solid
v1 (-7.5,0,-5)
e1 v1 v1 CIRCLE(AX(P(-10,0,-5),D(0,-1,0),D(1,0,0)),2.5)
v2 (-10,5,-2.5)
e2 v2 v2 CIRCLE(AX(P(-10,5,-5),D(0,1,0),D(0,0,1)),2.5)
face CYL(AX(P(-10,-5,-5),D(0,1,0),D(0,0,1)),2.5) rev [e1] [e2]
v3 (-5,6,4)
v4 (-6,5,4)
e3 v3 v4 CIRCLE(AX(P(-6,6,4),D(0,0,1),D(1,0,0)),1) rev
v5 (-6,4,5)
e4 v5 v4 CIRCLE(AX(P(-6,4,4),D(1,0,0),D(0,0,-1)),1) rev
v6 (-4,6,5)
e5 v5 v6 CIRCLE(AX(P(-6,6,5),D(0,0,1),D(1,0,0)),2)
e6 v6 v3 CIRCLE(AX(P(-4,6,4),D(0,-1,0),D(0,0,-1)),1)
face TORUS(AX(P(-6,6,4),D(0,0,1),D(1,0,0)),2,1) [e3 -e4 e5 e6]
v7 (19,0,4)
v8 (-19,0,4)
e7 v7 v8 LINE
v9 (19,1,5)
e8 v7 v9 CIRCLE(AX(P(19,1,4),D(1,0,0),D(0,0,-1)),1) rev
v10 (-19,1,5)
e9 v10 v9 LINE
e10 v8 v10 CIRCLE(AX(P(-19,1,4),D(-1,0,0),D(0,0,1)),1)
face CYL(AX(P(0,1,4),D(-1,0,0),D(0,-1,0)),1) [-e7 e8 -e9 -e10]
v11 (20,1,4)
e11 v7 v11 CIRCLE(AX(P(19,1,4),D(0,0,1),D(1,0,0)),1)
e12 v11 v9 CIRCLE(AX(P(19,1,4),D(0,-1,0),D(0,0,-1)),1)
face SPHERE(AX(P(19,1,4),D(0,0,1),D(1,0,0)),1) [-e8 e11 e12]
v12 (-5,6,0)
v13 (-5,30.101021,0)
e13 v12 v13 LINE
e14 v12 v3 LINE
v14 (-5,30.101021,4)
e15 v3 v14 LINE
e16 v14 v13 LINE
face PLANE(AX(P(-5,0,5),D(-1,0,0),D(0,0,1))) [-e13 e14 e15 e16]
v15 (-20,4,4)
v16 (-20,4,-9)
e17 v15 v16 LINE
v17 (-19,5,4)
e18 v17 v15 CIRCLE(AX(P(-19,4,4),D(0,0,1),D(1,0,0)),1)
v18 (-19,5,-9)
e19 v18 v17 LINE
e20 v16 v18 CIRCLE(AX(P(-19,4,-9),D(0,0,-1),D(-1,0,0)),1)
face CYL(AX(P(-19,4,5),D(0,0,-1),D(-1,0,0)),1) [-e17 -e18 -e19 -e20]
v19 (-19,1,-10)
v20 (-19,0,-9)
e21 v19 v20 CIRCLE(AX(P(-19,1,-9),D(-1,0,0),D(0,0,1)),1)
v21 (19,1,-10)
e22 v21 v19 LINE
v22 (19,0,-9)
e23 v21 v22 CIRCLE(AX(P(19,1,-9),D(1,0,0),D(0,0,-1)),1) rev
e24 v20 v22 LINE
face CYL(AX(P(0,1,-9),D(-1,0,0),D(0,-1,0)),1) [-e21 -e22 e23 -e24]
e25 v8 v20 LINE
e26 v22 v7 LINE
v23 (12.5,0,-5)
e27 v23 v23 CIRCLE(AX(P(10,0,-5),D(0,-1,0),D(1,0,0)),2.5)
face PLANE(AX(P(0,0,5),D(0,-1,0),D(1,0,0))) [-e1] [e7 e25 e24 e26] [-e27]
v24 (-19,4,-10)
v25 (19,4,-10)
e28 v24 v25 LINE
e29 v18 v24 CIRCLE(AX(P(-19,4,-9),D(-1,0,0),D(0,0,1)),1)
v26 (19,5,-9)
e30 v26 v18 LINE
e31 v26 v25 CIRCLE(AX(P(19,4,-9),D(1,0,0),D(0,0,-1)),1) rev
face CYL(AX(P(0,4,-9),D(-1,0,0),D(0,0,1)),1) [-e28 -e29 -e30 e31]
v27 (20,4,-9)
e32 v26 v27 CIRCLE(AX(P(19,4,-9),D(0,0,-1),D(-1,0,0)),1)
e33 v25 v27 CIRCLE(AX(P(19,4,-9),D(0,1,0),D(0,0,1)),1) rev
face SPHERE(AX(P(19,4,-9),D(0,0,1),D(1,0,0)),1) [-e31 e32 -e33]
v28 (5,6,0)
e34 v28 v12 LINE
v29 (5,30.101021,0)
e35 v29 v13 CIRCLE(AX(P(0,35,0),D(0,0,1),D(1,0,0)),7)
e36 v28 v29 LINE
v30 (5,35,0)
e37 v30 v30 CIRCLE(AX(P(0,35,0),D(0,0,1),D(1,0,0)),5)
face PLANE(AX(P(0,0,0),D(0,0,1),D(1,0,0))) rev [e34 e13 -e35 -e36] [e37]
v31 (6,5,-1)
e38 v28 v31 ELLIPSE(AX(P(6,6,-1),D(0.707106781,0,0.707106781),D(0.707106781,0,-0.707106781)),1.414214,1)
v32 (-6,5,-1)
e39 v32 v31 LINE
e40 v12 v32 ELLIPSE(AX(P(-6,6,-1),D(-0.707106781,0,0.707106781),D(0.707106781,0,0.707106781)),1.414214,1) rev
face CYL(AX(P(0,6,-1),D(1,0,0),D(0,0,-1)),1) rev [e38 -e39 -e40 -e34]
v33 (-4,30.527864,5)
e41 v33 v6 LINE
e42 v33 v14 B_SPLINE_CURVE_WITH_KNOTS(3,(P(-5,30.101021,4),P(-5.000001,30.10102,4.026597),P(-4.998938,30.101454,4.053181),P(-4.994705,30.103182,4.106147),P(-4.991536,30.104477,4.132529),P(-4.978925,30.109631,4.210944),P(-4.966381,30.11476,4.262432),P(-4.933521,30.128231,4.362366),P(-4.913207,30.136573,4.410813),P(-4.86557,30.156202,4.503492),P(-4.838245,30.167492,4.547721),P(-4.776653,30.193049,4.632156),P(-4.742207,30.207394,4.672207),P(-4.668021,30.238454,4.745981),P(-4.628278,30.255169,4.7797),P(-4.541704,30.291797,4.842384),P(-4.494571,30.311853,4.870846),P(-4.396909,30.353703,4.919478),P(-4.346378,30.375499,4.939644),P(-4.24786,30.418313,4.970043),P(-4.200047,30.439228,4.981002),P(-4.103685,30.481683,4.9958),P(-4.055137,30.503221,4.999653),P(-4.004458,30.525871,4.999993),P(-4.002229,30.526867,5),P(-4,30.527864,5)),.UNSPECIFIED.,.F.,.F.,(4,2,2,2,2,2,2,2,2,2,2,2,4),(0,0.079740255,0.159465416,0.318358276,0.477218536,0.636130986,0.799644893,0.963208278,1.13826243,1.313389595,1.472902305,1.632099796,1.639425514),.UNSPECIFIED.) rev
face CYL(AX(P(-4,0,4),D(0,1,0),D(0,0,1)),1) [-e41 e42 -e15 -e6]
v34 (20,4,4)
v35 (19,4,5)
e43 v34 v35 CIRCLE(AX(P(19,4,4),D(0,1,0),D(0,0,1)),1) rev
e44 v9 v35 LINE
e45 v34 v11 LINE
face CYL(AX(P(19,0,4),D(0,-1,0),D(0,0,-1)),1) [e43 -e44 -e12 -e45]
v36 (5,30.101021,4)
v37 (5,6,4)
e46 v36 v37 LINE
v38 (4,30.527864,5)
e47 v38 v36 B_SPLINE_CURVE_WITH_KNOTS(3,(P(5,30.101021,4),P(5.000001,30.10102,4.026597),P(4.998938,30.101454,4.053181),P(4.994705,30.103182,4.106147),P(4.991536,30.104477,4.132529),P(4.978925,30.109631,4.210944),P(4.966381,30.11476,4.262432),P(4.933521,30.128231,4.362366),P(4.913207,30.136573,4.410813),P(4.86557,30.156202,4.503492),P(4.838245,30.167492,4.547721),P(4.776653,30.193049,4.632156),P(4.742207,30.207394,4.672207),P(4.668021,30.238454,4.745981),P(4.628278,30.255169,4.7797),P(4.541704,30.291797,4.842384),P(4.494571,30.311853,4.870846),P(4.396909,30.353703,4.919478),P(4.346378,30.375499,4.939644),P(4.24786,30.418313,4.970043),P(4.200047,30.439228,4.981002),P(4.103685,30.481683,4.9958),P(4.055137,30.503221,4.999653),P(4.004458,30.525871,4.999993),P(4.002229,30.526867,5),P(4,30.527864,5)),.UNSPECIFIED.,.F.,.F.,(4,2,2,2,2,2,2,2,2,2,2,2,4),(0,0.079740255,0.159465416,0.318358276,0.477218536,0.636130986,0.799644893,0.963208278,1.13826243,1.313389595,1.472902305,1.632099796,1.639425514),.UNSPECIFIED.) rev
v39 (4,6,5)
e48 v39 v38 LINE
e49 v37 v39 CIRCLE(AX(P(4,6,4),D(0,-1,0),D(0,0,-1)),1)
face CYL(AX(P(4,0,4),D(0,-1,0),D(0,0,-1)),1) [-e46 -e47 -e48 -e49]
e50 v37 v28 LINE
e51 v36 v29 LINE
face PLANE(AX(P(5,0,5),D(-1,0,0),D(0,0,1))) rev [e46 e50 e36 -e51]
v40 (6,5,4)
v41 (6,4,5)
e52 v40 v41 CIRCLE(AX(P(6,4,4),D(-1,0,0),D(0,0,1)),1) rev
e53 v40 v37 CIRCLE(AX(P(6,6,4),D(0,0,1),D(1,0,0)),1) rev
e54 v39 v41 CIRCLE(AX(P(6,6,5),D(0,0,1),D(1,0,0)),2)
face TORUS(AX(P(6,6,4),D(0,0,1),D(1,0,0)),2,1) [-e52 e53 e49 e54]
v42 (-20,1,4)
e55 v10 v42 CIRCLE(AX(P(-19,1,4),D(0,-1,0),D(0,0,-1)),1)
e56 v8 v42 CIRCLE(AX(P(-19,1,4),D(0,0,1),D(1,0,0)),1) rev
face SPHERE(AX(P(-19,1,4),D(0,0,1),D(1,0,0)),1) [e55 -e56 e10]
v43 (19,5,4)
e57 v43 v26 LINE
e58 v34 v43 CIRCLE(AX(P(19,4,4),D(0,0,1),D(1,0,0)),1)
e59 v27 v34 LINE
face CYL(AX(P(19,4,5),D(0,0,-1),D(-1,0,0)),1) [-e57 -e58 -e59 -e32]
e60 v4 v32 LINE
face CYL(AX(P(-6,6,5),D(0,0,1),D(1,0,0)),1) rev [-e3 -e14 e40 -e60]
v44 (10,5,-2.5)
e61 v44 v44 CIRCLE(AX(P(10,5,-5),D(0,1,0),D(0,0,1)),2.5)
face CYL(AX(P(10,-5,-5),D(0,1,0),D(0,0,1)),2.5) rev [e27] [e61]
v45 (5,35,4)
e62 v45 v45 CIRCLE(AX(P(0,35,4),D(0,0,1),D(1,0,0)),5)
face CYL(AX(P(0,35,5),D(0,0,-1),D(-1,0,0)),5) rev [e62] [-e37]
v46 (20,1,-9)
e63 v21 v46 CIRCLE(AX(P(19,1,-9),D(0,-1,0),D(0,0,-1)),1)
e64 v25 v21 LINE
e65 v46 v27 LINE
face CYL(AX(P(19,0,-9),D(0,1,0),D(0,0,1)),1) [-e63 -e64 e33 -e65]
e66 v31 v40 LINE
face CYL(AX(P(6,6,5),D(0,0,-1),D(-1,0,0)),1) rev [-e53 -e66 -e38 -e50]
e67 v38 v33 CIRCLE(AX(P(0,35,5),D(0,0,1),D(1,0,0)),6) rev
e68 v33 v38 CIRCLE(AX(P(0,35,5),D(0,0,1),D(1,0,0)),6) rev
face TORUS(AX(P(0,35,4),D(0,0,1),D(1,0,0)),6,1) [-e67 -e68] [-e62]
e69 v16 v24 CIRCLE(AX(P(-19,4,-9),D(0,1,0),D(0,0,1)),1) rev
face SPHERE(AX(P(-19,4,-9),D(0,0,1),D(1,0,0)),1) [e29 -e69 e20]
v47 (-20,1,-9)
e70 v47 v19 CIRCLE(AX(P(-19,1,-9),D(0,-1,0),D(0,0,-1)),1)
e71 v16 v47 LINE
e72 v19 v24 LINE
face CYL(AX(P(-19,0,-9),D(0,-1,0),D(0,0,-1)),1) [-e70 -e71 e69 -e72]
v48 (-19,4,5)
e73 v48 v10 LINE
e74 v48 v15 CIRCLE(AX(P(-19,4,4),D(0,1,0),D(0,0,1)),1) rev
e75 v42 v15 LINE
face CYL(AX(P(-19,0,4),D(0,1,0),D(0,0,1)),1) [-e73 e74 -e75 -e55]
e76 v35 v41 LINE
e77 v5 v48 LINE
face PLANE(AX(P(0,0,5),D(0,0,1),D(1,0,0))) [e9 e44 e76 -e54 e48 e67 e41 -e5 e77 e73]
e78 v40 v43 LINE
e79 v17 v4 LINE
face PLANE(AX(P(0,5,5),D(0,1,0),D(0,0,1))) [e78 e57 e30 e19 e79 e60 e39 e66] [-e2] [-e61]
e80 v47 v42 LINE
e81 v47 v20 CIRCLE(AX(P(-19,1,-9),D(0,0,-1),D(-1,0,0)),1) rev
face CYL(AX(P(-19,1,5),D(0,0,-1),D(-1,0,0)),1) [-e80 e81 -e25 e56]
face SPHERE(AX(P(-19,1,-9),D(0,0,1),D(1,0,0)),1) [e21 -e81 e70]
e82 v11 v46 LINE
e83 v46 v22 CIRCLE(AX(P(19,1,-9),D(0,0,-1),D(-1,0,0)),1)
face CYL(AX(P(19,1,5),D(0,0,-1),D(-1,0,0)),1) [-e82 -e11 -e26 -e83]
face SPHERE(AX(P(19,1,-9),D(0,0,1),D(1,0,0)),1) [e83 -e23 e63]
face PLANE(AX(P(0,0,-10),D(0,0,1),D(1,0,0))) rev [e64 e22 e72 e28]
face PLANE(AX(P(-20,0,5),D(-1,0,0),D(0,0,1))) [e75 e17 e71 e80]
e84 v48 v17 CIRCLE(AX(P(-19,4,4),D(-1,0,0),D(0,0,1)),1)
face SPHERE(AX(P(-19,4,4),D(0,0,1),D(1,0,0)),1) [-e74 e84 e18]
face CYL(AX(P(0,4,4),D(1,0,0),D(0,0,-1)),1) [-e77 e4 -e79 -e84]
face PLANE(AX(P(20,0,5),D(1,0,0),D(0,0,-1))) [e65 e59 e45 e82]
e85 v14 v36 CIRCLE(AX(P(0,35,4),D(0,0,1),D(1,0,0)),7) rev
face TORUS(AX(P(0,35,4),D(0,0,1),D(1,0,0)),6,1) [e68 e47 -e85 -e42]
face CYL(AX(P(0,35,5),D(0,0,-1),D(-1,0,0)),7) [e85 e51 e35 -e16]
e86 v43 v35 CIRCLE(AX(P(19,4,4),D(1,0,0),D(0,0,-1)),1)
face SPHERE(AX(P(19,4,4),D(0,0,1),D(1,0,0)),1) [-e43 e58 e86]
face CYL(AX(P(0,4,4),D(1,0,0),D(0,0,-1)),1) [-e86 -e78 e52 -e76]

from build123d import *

# Parameters (mm, degrees)
SKETCH_1_R          = 5
EXTRUDE_1_DEPTH     = 5
EXTRUDE_2_DEPTH     = 10
FILLET_1_R          = 1
SKETCH_2_R          = 2.5
CUT_EXTRUDE_1_DEPTH = 10


with BuildPart() as part:
    # 草图1 → 凸台-拉伸1 (new body)
    with BuildSketch(Plane.XY):
        with BuildLine():
            Line((-20, 0), (20, 0))
            Line((20, 0), (20, 5))
            Line((20, 5), (5, 5))
            Line((5, 5), (5, 30.101020514))
            ThreePointArc((5, 30.101020514), (0, 42), (-5, 30.101020514))
            Line((-5, 30.101020514), (-5, 5))
            Line((-5, 5), (-20, 5))
            Line((-20, 5), (-20, 0))
        make_face()
        with Locations((0, 35)):
            Circle(SKETCH_1_R, mode=Mode.SUBTRACT)
    extrude(amount=EXTRUDE_1_DEPTH)

    # 草图1<3> → 凸台-拉伸2 (add)
    with BuildSketch(Plane.XY):
        Polygon((0, 5), (0, 0), (20, 0), (20, 5), (5, 5), align=None)
        Polygon((-20, 0), (0, 0), (0, 5), (-5, 5), (-20, 5), align=None)
    extrude(amount=-EXTRUDE_2_DEPTH)

    # 圆角1
    fillet_1_edges = [part.edges().sort_by_distance(p)[0] for p in [
        (-5, 17.550510257, 5),
        (-12.5, 5, 5),
        (5, 5, 2.5),
        (20, 5, -2.5),
        (20, 0, -2.5),
        (-20, 0, -2.5),
        (-20, 5, -2.5),
        (-5, 5, 2.5),
        (-20, 2.5, 5),
        (0, 0, 5),
        (0, 5, 0),
        (20, 2.5, 5),
        (0, 0, -10),
        (20, 2.5, -10),
        (-20, 2.5, -10),
        (0, 5, -10),
        (12.5, 5, 5),
        (-5, 35, 5),
        (5, 17.550510257, 5),
        (0, 42, 5),
    ]]
    fillet(fillet_1_edges, radius=FILLET_1_R - 0.0001)  # a hair under: the kernel refuses the full size

    # 草图2 → 切除-拉伸1 (cut)
    with BuildSketch(Plane(origin=(0, 5, 0), x_dir=(1, 0, 0), z_dir=(0, 1, 0))):
        with Locations(Location((-10, 5, 0), (0, 0, 270))):
            Circle(SKETCH_2_R)
        with Locations(Location((10, 5, 0), (0, 0, 270))):
            Circle(SKETCH_2_R)
    extrude(amount=-CUT_EXTRUDE_1_DEPTH, mode=Mode.SUBTRACT)


solid = part.part
